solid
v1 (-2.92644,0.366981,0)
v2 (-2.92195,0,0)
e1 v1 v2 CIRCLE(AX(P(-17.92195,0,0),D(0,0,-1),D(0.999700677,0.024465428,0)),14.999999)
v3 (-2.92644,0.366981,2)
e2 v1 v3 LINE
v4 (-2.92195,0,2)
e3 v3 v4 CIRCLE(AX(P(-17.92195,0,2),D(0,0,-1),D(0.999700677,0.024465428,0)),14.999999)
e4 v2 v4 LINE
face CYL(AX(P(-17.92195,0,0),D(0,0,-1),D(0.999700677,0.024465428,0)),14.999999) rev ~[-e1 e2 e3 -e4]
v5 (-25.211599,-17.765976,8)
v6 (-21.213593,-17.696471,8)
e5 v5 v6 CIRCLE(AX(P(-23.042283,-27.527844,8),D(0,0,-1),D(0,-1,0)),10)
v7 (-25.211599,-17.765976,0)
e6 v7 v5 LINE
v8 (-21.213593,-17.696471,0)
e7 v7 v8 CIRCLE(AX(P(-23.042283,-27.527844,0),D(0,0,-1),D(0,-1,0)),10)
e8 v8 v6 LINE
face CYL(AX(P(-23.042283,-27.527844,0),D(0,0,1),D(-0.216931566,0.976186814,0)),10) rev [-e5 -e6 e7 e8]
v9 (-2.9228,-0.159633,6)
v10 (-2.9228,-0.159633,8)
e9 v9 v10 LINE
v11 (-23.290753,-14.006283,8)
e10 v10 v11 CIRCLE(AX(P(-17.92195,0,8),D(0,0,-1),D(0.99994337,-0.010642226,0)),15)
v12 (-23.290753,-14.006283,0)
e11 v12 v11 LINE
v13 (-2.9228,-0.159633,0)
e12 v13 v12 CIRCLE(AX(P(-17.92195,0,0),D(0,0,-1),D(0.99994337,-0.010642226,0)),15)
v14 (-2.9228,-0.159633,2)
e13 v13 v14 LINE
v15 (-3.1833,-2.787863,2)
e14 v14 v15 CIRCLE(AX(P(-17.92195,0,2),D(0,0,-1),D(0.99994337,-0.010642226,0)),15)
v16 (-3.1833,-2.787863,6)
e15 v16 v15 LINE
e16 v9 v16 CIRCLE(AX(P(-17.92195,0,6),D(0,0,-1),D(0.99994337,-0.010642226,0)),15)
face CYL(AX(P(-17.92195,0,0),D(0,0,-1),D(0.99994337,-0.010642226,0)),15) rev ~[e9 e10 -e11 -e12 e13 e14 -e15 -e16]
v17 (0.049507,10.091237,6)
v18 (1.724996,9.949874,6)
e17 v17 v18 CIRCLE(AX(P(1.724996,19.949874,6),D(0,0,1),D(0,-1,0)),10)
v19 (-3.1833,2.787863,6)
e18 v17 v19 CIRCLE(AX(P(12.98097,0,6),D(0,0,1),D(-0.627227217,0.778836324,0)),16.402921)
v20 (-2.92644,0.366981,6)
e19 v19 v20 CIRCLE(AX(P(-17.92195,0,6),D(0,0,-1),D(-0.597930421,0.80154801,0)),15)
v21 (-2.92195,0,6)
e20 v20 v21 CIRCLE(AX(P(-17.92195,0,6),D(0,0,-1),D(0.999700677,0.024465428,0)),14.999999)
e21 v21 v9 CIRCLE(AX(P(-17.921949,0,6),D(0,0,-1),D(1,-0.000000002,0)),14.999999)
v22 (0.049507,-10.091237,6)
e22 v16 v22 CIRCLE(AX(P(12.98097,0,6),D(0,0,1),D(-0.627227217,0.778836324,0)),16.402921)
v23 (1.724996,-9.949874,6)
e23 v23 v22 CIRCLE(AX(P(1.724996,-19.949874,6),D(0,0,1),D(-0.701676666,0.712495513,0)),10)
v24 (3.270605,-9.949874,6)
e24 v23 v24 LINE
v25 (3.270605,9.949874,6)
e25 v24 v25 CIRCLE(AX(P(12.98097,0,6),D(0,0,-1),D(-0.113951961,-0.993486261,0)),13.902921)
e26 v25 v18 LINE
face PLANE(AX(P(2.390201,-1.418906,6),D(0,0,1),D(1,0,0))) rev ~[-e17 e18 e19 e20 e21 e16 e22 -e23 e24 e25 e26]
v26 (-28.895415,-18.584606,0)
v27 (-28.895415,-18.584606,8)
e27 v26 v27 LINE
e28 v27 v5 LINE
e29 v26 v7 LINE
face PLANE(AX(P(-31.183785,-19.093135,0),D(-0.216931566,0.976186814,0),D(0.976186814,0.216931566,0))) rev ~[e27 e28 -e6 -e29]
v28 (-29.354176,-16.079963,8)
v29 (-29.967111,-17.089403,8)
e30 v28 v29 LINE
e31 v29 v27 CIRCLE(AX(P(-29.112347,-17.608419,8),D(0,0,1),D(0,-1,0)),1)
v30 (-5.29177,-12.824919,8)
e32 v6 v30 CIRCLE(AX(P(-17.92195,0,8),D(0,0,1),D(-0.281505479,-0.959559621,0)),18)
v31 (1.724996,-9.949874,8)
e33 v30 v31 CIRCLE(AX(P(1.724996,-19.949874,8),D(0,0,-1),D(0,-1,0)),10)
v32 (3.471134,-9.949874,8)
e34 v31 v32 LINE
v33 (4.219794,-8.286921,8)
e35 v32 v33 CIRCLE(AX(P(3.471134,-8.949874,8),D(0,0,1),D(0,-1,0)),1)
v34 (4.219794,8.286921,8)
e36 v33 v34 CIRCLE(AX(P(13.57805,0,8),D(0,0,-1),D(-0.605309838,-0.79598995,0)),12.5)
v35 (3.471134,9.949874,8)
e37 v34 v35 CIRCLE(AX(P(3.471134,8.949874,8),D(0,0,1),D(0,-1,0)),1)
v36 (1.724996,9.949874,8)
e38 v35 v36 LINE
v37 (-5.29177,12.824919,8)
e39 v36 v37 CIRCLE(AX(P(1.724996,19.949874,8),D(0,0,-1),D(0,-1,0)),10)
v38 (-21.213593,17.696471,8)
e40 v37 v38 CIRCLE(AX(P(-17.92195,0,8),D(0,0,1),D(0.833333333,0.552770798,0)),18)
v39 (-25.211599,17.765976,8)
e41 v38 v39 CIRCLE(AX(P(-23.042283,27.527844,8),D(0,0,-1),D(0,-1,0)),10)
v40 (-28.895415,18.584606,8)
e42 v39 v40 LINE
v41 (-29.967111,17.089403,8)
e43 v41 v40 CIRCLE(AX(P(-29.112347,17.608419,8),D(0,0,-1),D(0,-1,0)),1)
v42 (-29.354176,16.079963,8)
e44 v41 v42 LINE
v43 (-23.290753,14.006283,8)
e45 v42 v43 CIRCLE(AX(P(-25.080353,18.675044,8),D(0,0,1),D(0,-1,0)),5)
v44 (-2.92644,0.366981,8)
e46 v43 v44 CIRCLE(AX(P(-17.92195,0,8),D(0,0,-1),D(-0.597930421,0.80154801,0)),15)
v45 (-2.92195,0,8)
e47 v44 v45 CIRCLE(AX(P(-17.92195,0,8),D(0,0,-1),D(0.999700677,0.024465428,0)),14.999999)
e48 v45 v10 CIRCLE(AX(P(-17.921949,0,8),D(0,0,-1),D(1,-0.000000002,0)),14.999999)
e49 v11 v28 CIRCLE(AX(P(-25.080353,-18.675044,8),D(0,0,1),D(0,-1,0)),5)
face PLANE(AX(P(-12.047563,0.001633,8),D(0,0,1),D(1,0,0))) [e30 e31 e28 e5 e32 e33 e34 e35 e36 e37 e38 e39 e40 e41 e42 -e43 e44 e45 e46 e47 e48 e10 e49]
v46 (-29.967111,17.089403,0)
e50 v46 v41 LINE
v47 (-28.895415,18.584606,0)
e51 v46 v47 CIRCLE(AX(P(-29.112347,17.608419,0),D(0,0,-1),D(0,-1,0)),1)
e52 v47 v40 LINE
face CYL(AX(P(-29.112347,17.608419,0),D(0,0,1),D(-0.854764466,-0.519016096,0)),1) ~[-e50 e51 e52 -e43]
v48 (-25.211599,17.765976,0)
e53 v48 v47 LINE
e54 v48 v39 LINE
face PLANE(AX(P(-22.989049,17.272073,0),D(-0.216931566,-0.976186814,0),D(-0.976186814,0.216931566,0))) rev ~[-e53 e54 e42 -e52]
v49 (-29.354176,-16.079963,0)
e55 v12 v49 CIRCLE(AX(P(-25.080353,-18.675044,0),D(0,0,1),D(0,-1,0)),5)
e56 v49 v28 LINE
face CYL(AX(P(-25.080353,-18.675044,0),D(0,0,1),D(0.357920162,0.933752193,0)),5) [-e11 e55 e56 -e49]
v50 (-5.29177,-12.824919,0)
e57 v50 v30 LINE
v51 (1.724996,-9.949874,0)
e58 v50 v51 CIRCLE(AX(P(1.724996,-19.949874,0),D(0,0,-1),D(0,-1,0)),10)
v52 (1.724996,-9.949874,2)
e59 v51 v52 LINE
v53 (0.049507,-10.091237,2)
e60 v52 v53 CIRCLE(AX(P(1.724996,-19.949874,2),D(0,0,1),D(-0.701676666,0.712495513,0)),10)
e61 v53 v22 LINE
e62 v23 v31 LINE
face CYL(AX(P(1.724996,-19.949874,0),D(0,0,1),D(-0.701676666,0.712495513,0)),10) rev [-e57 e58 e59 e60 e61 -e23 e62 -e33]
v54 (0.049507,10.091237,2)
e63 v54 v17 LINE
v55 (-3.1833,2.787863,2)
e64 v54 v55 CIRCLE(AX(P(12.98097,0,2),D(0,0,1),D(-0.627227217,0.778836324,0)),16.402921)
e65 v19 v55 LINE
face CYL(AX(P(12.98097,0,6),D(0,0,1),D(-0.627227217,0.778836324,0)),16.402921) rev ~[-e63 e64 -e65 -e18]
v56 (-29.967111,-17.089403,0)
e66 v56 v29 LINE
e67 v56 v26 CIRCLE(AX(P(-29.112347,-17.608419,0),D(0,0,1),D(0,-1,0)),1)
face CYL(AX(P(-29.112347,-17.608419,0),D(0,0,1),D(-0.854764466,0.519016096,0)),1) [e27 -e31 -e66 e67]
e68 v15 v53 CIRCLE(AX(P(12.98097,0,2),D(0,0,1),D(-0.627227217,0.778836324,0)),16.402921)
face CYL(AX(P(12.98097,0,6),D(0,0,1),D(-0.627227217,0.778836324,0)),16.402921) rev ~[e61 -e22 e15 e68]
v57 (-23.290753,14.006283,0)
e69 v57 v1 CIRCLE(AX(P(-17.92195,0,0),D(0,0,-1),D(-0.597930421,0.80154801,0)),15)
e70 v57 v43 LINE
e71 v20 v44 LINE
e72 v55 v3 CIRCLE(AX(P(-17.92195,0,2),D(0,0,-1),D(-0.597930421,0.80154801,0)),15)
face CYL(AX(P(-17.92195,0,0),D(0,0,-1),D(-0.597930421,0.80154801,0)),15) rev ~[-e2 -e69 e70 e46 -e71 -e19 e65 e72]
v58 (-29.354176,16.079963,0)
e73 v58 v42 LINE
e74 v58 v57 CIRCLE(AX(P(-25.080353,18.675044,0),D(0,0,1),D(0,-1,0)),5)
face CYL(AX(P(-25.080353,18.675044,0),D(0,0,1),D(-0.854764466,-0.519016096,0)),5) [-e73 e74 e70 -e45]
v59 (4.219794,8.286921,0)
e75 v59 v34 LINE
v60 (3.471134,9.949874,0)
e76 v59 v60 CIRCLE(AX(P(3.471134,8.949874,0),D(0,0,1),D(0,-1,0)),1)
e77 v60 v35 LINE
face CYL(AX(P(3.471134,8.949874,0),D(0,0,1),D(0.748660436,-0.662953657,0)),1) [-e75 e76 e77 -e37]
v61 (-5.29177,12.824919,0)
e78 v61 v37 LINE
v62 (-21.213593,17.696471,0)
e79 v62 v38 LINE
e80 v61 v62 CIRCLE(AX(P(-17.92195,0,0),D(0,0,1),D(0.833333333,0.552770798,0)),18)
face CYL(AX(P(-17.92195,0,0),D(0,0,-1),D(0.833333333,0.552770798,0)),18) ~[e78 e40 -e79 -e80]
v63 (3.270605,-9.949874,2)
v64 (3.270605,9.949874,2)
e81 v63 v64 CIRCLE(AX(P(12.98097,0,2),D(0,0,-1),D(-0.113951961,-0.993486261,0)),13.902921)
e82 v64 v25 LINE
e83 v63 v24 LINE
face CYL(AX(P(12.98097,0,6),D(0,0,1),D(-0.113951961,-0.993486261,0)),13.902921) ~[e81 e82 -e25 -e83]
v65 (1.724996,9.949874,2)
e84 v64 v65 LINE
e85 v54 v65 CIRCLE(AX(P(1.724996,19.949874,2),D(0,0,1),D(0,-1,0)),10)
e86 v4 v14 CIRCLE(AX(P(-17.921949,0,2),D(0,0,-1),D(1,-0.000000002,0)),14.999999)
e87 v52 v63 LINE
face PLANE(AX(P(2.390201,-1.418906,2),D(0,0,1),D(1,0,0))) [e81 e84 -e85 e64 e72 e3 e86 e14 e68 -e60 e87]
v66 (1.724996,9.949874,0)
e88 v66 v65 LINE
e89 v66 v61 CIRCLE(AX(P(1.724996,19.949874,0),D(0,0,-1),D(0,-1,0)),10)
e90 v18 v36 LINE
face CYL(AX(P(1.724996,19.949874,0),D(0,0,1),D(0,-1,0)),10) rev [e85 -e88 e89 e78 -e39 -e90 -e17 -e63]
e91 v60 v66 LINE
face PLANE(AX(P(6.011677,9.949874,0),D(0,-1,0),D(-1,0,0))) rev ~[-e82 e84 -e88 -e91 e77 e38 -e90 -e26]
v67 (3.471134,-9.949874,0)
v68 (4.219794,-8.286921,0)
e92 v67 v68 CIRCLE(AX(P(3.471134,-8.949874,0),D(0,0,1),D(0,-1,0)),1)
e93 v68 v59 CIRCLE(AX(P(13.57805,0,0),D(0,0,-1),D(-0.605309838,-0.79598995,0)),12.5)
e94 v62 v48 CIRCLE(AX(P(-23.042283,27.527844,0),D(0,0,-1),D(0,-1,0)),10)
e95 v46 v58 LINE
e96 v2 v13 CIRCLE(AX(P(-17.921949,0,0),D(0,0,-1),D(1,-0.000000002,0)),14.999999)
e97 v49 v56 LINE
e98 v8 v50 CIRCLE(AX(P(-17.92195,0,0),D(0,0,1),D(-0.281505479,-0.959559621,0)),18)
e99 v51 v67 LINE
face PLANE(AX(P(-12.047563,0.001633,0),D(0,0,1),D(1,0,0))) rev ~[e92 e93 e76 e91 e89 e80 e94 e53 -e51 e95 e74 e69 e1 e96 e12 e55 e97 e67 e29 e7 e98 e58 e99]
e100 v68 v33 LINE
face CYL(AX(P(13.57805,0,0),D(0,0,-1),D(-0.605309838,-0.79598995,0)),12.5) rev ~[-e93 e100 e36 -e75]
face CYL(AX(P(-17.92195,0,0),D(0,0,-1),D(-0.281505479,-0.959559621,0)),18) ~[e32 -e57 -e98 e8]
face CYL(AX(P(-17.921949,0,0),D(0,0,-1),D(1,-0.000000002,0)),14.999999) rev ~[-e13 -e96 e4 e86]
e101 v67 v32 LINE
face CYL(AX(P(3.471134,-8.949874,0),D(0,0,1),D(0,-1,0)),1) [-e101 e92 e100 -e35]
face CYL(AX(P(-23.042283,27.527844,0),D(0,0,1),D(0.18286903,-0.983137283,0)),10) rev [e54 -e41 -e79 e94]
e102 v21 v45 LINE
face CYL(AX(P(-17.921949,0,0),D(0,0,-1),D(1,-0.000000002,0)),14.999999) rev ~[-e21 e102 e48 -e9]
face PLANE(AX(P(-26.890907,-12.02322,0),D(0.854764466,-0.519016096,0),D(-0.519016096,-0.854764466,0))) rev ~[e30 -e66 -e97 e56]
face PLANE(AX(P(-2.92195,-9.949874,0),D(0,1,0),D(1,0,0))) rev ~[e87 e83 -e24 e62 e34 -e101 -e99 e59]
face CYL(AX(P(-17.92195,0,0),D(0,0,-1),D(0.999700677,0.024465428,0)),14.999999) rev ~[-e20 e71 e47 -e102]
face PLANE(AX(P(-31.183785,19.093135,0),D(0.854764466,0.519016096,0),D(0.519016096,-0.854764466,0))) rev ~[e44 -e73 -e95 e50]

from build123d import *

# Parameters (mm, degrees)
F1_DEPTH = 8
F2_R     = 5
F3_R     = 1
F4_R     = 10
F7_DEPTH = 4
F8_R     = 1


# Not quite as in the source:
# - a feature names something its author has since deleted; it is built from what else it names


with BuildPart() as f1:
    # F0 (on Top) → F1 (new body)
    with BuildSketch(Plane.XY):
        with BuildLine():
            ThreePointArc((-2.9227996939, -0.1596333839), (-11.2678550126, -13.4433261015), (-26.890906557, -12.0232201439))
            Line((-26.890906557, -12.0232201439), (-31.1837848276, -19.0931353718))
            Line((-31.1837848276, -19.0931353718), (-22.9890488593, -17.2720731705))
            ThreePointArc((-22.9890488593, -17.2720731705), (-11.7519193442, -16.909486057), (-2.9219502426, -9.9498743711))
            Line((-2.9219502426, -9.9498743711), (6.0116767822, -9.9498743711))
            ThreePointArc((6.0116767822, -9.9498743711), (1.0780497574, 0), (6.0116767822, 9.9498743711))
            Line((6.0116767822, 9.9498743711), (-2.9219502426, 9.9498743711))
            ThreePointArc((-2.9219502426, 9.9498743711), (-11.7519193442, 16.909486057), (-22.9890488593, 17.2720731705))
            Line((-22.9890488593, 17.2720731705), (-31.1837848276, 19.0931353718))
            Line((-31.1837848276, 19.0931353718), (-26.890906557, 12.0232201439))
            ThreePointArc((-26.890906557, 12.0232201439), (-11.3609432233, 13.4890024425), (-2.9264400932, 0.3669814152))
            Line((-2.9264400932, 0.3669814152), (-2.9219502426, 0.3647975664))
            Line((-2.9219502426, 0.3647975664), (-2.9219502426, -3.27e-08))
            Line((-2.9219502426, -3.27e-08), (-2.9219502426, -0.1592372783))
            Line((-2.9219502426, -0.1592372783), (-2.9227996939, -0.1596333839))
        make_face()
        with BuildLine():
            ThreePointArc((-2.9219502426, -3.27e-08), (-2.922162607, -0.0798178383), (-2.9227996939, -0.1596333839))
            Line((-2.9227996939, -0.1596333839), (-2.9219502426, -0.1592372783))
            Line((-2.9219502426, -0.1592372783), (-2.9219502426, -3.27e-08))
        make_face()
        with BuildLine():
            ThreePointArc((-2.9264400932, 0.3669814152), (-2.923072747, 0.1835044236), (-2.9219502426, -3.27e-08))
            Line((-2.9219502426, -3.27e-08), (-2.9219502426, 0.3647975664))
            Line((-2.9219502426, 0.3647975664), (-2.9264400932, 0.3669814152))
        make_face()
    extrude(amount=F1_DEPTH)

    # F2
    f2_edges = [f1.edges().sort_by_distance(p)[0] for p in [
        (-26.890907, 12.02322, 4),
        (-26.890907, -12.02322, 4),
    ]]
    fillet(f2_edges, radius=F2_R)

    # F3
    f3_edges = [f1.edges().sort_by_distance(p)[0] for p in [
        (-31.183785, -19.093135, 4),
        (-31.183785, 19.093135, 4),
    ]]
    fillet(f3_edges, radius=F3_R)

    # F4
    f4_edges = [f1.edges().sort_by_distance(p)[0] for p in [
        (-2.92195, 9.949874, 4),
        (-2.92195, -9.949874, 4),
        (-22.989049, 17.272073, 4),
        (-22.989049, -17.272073, 4),
    ]]
    fillet(f4_edges, radius=F4_R)

    # F6 (on offset) → F7 (cut)
    with BuildSketch(Plane.XY.offset(6)):
        with BuildLine():
            ThreePointArc((11.3967054025, -13.8123607251), (-0.7746921386, -2.0181552322), (7.4959259895, 12.7751904709))
            Line((7.4959259895, 12.7751904709), (2.6926121721, 12.7751904709))
            ThreePointArc((2.6926121721, 12.7751904709), (-3.3979094134, -0.8877509035), (4.1336827916, -13.8123607251))
            Line((4.1336827916, -13.8123607251), (11.3967054025, -13.8123607251))
        make_face()
    extrude(amount=-F7_DEPTH, mode=Mode.SUBTRACT)

    # F8
    f8_edges = [f1.edges().sort_by_distance(p)[0] for p in [
        (6.011677, 9.949874, 4),
        (6.011677, -9.949874, 4),
    ]]
    fillet(f8_edges, radius=F8_R)


solid = f1.part
